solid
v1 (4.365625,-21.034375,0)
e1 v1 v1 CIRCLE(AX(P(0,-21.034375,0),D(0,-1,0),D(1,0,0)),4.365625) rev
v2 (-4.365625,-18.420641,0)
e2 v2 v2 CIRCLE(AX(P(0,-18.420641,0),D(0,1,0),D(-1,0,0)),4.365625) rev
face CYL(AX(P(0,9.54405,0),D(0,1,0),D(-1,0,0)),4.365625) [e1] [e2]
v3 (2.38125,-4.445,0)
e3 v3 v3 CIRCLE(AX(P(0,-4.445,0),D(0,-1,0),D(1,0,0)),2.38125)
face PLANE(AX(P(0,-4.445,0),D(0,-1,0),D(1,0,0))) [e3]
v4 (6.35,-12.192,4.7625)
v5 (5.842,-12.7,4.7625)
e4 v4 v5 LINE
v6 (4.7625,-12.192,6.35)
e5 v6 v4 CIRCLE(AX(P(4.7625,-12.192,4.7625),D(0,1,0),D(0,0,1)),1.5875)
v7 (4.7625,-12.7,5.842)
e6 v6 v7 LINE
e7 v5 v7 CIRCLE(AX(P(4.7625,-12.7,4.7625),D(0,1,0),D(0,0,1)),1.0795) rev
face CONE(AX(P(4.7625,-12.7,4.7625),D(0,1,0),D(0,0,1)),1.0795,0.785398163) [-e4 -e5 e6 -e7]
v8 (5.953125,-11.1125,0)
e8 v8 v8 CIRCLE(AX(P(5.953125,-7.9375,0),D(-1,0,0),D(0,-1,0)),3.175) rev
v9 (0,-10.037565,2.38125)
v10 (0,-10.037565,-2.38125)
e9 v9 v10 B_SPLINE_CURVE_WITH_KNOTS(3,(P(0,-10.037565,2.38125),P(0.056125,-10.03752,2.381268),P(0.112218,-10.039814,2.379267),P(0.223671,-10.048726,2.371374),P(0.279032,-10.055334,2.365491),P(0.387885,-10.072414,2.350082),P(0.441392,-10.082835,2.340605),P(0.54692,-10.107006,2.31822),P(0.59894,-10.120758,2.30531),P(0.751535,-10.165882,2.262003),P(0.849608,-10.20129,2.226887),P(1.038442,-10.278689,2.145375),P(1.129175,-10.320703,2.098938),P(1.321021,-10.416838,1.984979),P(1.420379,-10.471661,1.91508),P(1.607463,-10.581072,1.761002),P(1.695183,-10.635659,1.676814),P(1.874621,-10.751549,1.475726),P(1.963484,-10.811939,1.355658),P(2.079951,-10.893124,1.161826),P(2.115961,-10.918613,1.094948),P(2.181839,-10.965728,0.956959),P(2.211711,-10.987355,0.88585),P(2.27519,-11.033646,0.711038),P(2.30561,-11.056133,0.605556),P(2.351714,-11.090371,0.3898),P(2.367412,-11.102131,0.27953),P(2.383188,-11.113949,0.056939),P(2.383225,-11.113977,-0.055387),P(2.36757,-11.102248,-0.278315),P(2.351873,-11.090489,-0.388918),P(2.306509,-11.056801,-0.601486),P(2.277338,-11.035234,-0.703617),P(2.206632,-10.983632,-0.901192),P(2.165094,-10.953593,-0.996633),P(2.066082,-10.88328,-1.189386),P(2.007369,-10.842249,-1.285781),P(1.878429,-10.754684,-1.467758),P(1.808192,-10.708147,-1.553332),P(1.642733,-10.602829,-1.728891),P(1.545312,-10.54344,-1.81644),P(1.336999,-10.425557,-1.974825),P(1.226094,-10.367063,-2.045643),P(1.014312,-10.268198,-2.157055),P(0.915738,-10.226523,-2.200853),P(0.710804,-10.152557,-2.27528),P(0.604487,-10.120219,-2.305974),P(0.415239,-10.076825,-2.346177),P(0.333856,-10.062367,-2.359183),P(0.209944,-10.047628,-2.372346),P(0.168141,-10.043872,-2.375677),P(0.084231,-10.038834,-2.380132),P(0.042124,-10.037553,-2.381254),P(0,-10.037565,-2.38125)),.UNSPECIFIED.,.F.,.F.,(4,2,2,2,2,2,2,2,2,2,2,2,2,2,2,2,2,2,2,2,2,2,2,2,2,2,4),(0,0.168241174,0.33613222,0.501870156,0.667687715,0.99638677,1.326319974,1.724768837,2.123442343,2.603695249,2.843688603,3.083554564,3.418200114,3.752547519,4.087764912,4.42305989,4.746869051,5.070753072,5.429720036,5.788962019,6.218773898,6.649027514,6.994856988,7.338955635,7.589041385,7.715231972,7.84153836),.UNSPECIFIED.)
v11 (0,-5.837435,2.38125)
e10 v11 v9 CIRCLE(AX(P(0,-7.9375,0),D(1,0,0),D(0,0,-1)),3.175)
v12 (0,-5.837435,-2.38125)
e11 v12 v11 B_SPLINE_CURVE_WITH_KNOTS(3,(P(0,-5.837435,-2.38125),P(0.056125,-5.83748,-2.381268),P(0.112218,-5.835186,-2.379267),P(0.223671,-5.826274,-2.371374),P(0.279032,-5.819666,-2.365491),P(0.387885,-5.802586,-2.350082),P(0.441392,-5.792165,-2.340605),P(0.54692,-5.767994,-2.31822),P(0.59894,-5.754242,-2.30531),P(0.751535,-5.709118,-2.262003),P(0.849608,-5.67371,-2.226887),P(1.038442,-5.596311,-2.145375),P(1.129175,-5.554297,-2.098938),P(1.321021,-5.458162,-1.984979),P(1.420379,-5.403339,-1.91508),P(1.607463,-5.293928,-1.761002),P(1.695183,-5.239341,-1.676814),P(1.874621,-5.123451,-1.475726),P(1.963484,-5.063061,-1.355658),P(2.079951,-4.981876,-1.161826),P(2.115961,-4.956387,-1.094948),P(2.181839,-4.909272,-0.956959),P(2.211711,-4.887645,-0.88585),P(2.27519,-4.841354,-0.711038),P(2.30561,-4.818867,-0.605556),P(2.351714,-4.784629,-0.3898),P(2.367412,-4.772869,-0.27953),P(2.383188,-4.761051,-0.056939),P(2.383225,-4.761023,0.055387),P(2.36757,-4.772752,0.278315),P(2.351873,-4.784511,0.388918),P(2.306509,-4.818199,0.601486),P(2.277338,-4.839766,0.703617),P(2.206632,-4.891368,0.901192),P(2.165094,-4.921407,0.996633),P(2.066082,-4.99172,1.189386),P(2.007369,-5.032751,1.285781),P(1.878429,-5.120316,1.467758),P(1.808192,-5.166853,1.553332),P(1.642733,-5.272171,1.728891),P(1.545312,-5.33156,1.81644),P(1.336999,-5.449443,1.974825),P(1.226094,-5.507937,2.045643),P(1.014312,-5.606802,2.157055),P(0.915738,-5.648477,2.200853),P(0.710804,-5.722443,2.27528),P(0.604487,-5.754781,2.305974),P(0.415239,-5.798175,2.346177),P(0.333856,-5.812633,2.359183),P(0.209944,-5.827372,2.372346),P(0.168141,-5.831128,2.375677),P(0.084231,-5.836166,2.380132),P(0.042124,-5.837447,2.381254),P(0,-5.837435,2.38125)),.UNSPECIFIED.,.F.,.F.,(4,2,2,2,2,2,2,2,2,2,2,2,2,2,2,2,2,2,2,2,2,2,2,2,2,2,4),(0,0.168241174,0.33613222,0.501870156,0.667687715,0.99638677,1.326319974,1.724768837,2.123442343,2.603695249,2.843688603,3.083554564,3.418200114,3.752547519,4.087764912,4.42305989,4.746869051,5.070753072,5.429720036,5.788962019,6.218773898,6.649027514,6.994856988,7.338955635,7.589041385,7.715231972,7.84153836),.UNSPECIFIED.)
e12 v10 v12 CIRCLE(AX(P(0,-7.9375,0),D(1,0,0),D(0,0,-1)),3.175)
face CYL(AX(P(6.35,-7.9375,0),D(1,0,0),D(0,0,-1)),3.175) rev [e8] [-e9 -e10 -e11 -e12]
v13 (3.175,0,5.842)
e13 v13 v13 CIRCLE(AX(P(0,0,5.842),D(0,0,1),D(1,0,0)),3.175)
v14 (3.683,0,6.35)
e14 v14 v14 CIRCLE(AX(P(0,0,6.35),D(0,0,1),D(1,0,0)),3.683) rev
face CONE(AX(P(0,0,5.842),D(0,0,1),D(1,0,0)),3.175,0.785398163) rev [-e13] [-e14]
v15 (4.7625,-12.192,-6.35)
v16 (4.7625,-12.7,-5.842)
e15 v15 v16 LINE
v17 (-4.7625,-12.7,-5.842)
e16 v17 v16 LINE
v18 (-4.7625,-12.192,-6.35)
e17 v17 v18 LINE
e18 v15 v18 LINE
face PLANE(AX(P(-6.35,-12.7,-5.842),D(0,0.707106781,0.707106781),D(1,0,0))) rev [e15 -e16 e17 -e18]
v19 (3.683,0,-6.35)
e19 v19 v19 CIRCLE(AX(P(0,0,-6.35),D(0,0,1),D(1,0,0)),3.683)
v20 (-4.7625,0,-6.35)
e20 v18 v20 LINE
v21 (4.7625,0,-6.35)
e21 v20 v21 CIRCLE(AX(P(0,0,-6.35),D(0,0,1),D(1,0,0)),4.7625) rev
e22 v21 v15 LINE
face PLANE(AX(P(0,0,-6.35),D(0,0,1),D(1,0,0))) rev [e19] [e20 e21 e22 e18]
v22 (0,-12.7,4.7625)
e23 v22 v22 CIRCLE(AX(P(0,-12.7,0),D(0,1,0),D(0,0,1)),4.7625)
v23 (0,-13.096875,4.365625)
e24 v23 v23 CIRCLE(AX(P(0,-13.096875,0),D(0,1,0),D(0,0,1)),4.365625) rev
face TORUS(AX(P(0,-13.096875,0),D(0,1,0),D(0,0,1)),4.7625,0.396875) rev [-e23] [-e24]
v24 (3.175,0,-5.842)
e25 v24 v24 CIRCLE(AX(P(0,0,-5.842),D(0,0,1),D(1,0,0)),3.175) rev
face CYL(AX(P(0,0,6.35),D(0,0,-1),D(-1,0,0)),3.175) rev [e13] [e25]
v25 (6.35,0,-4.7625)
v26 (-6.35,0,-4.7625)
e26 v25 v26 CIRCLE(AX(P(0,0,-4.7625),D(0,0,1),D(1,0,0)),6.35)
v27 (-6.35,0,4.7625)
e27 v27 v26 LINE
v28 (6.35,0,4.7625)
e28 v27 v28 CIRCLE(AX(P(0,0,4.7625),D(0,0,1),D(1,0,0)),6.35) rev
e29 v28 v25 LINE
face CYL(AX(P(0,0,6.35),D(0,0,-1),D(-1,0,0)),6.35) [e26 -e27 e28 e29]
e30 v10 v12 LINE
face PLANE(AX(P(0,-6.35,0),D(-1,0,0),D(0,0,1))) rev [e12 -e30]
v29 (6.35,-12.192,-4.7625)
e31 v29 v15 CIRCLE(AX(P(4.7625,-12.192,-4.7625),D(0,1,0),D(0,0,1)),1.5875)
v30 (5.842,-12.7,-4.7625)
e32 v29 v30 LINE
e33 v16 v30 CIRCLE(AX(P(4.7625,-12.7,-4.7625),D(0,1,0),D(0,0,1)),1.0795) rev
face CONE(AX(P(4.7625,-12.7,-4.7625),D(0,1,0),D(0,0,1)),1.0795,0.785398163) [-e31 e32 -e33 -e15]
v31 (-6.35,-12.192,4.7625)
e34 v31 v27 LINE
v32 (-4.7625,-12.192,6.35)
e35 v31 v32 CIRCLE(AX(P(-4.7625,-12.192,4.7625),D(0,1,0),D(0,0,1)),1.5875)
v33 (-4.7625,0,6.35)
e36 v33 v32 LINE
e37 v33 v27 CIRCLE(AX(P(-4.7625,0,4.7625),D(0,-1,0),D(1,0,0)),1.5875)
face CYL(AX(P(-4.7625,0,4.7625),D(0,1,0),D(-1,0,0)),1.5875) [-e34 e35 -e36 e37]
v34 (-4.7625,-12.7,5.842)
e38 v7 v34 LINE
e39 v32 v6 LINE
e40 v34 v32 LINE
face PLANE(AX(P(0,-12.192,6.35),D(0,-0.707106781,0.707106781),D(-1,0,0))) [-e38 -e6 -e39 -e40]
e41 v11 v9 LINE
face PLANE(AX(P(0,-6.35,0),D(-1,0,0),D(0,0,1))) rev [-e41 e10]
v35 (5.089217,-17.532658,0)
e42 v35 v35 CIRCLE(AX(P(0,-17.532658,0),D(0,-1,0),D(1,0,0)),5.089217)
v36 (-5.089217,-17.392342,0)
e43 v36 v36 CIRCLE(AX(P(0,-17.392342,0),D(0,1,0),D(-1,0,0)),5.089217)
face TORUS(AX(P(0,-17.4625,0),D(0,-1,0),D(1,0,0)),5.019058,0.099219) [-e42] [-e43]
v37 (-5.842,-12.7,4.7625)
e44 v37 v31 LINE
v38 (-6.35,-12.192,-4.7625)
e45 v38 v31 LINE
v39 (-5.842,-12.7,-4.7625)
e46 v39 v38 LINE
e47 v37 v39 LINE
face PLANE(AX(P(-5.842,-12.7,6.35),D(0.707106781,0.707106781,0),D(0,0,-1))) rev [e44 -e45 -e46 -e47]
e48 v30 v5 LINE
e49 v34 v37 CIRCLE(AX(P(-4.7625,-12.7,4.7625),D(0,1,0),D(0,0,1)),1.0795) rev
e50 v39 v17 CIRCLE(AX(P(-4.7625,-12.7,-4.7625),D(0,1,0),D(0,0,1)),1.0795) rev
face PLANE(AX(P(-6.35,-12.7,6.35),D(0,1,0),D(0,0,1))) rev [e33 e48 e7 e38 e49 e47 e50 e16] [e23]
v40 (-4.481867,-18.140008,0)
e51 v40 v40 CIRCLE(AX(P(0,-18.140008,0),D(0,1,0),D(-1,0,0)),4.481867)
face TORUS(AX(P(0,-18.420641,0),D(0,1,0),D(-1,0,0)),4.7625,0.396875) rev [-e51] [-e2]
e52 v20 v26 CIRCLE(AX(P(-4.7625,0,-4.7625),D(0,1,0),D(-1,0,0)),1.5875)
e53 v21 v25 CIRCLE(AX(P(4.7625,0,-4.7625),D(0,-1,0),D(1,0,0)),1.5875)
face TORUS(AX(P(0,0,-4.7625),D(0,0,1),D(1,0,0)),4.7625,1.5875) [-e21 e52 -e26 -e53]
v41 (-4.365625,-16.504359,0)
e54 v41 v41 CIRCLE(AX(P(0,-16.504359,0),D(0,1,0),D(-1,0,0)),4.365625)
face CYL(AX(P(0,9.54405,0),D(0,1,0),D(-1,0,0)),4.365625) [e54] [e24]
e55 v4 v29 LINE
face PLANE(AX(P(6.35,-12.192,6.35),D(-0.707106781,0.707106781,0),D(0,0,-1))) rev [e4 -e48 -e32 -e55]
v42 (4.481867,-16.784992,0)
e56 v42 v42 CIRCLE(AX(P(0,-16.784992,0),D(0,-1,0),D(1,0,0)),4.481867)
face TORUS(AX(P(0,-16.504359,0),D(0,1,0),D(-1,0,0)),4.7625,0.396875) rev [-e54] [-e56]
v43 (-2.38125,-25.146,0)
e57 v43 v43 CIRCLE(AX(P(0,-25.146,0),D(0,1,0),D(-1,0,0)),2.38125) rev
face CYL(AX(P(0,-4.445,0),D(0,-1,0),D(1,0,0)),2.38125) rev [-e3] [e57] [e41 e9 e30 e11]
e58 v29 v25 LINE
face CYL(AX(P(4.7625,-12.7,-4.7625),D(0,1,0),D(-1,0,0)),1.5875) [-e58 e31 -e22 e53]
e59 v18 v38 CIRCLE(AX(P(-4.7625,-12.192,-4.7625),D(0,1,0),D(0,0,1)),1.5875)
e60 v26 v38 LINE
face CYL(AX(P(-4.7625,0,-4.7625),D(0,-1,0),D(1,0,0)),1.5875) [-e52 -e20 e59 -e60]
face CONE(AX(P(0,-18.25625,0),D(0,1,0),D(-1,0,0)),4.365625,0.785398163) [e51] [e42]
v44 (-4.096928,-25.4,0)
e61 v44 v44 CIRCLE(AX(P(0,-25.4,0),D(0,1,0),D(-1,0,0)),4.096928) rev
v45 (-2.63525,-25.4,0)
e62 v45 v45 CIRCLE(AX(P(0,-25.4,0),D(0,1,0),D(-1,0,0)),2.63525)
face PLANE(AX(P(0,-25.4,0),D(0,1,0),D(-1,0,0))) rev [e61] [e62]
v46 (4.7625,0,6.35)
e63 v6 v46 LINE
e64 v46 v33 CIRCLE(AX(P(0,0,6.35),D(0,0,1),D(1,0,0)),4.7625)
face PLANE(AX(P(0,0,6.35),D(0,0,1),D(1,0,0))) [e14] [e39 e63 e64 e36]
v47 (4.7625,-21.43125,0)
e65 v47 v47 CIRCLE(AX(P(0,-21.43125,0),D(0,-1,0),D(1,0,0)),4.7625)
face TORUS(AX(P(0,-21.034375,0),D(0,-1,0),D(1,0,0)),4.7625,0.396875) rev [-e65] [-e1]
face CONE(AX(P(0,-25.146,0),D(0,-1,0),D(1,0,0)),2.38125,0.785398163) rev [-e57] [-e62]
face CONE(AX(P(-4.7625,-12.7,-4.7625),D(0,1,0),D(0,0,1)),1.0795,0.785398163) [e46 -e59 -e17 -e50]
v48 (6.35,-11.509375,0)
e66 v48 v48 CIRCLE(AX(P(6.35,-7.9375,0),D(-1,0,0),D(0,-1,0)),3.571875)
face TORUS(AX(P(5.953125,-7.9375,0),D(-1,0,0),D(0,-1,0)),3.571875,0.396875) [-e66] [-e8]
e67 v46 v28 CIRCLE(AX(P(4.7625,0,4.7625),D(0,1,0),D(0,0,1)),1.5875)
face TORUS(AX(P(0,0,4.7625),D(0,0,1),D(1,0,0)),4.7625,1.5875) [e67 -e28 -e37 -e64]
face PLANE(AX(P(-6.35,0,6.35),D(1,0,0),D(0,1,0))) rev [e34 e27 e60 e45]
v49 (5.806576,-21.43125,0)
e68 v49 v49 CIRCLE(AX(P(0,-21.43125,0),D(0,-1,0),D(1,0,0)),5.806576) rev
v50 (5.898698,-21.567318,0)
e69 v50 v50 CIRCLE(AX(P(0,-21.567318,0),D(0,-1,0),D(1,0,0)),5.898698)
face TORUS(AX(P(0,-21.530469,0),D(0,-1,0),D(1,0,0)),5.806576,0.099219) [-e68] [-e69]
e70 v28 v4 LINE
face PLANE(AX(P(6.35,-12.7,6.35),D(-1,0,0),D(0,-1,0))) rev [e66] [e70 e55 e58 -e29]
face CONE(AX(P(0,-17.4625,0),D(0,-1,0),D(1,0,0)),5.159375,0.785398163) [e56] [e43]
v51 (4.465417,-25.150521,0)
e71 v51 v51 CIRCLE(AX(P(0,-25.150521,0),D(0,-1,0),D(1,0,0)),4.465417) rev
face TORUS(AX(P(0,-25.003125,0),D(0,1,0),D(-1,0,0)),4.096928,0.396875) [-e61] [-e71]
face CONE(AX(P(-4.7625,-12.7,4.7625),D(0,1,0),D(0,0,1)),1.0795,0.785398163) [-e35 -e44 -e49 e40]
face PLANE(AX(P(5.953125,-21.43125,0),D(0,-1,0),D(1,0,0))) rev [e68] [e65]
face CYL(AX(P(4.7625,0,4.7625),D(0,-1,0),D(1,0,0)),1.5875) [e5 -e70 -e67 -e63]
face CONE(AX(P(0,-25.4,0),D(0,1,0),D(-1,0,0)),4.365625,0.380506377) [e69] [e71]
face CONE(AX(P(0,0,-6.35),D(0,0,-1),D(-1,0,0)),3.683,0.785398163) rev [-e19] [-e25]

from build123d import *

# Parameters (mm, degrees)
SKETCH1_R                                  = 3.175
BOSS_EXTRUDE1_DEPTH                        = 6.35
SKETCH3_R                                  = 2.38125
CUT_EXTRUDE1_DEPTH                         = 20.955
CBORE_FOR_1_4_SOCKET_SHOULDER_SCREW1_OUT_R = 3.175
CBORE_FOR_1_4_SOCKET_SHOULDER_SCREW1_DEPTH = 6.35
FILLET1_R                                  = 1.5875
FILLET2_R                                  = 0.396875
FILLET3_R                                  = 0.09921875
CHAMFER1_SIZE                              = 0.508
CHAMFER2_SIZE                              = 0.254


# Read off the part's stored shape, not the designer's step: CBORE for 1/4 Socket Shoulder Screw1
with BuildPart() as part:
    # Sketch1 → Boss-Extrude1 (new, symmetric)
    with BuildSketch(Plane.XY):
        with BuildLine():
            Line((-6.35, 0), (-6.35, -12.7))
            Line((-6.35, -12.7), (6.35, -12.7))
            Line((6.35, -12.7), (6.35, 0))
            ThreePointArc((6.35, 0), (0, 6.35), (-6.35, 0))
        make_face()
        Circle(SKETCH1_R, mode=Mode.SUBTRACT)
    extrude(amount=BOSS_EXTRUDE1_DEPTH, both=True)

    # Sketch2 → Revolve1 (revolve)
    with BuildSketch(Plane.XY, mode=Mode.PRIVATE) as revolve1_sk:
        Polygon((0, -12.7), (4.365625, -12.7), (4.365625, -16.66875), (5.159375, -17.4625), (4.365625, -18.25625), (4.365625, -21.43125), (5.953125, -21.43125), (4.365625, -25.4), (0, -25.4), align=None)
    revolve(revolve1_sk.sketch.rotate(Axis((0, 9.54404991, 0), (0, -1, 0)), 180), axis=Axis((0, 9.54404991, 0), (0, -1, 0)))

    # Sketch3 → Cut-Extrude1 (cut)
    with BuildSketch(Plane.XZ.offset(25.4)):
        Circle(SKETCH3_R)
    extrude(amount=-CUT_EXTRUDE1_DEPTH, mode=Mode.SUBTRACT)

    # CBORE for 1/4 Socket Shoulder Screw1 out → CBORE for 1/4 Socket Shoulder Screw1 (cut)
    with BuildSketch(Plane.YZ):
        with Locations((-7.9375, 0)):
            Circle(CBORE_FOR_1_4_SOCKET_SHOULDER_SCREW1_OUT_R)
    extrude(amount=CBORE_FOR_1_4_SOCKET_SHOULDER_SCREW1_DEPTH, mode=Mode.SUBTRACT)

    # Fillet1
    fillet1_edges = [part.edges().sort_by_distance(p)[0] for p in [
        (-6.35, -6.35, 6.35),
        (6.35, -6.35, 6.35),
        (0, 6.35, -6.35),
        (-6.35, -6.35, -6.35),
        (6.35, -6.35, -6.35),
        (0, 6.35, 6.35),
    ]]
    fillet(fillet1_edges, radius=FILLET1_R)

    # Fillet2
    fillet2_edges = [part.edges().sort_by_distance(p)[0] for p in [
        (4.365625, -12.7, 0),
        (4.365625, -16.66875, 0),
        (4.365625, -18.25625, 0),
        (4.365625, -21.43125, 0),
        (4.365625, -25.4, 0),
        (6.35, -11.1125, 0),
    ]]
    fillet(fillet2_edges, radius=FILLET2_R)

    # Fillet3
    fillet3_edges = [part.edges().sort_by_distance(p)[0] for p in [
        (5.159375, -17.4625, 0),
        (5.953125, -21.43125, 0),
    ]]
    fillet(fillet3_edges, radius=FILLET3_R)

    # Chamfer1
    chamfer1_edges = [part.edges().sort_by_distance(p)[0] for p in [
        (-3.175, 0, -6.35),
        (-3.175, 0, 6.35),
        (6.35, -12.7, 0),
        (0, -12.7, -6.35),
        (0, -12.7, 6.35),
        (-6.35, -12.7, 0),
        (5.885032015, -12.7, 5.885032015),
        (-5.885032015, -12.7, 5.885032015),
        (-5.885032015, -12.7, -5.885032015),
        (5.885032015, -12.7, -5.885032015),
    ]]
    chamfer(chamfer1_edges, length=CHAMFER1_SIZE)

    # Chamfer2
    chamfer2_edges = [part.edges().sort_by_distance(p)[0] for p in [
        (-2.38125, -25.4, 0),
    ]]
    chamfer(chamfer2_edges, length=CHAMFER2_SIZE)


solid = part.part
